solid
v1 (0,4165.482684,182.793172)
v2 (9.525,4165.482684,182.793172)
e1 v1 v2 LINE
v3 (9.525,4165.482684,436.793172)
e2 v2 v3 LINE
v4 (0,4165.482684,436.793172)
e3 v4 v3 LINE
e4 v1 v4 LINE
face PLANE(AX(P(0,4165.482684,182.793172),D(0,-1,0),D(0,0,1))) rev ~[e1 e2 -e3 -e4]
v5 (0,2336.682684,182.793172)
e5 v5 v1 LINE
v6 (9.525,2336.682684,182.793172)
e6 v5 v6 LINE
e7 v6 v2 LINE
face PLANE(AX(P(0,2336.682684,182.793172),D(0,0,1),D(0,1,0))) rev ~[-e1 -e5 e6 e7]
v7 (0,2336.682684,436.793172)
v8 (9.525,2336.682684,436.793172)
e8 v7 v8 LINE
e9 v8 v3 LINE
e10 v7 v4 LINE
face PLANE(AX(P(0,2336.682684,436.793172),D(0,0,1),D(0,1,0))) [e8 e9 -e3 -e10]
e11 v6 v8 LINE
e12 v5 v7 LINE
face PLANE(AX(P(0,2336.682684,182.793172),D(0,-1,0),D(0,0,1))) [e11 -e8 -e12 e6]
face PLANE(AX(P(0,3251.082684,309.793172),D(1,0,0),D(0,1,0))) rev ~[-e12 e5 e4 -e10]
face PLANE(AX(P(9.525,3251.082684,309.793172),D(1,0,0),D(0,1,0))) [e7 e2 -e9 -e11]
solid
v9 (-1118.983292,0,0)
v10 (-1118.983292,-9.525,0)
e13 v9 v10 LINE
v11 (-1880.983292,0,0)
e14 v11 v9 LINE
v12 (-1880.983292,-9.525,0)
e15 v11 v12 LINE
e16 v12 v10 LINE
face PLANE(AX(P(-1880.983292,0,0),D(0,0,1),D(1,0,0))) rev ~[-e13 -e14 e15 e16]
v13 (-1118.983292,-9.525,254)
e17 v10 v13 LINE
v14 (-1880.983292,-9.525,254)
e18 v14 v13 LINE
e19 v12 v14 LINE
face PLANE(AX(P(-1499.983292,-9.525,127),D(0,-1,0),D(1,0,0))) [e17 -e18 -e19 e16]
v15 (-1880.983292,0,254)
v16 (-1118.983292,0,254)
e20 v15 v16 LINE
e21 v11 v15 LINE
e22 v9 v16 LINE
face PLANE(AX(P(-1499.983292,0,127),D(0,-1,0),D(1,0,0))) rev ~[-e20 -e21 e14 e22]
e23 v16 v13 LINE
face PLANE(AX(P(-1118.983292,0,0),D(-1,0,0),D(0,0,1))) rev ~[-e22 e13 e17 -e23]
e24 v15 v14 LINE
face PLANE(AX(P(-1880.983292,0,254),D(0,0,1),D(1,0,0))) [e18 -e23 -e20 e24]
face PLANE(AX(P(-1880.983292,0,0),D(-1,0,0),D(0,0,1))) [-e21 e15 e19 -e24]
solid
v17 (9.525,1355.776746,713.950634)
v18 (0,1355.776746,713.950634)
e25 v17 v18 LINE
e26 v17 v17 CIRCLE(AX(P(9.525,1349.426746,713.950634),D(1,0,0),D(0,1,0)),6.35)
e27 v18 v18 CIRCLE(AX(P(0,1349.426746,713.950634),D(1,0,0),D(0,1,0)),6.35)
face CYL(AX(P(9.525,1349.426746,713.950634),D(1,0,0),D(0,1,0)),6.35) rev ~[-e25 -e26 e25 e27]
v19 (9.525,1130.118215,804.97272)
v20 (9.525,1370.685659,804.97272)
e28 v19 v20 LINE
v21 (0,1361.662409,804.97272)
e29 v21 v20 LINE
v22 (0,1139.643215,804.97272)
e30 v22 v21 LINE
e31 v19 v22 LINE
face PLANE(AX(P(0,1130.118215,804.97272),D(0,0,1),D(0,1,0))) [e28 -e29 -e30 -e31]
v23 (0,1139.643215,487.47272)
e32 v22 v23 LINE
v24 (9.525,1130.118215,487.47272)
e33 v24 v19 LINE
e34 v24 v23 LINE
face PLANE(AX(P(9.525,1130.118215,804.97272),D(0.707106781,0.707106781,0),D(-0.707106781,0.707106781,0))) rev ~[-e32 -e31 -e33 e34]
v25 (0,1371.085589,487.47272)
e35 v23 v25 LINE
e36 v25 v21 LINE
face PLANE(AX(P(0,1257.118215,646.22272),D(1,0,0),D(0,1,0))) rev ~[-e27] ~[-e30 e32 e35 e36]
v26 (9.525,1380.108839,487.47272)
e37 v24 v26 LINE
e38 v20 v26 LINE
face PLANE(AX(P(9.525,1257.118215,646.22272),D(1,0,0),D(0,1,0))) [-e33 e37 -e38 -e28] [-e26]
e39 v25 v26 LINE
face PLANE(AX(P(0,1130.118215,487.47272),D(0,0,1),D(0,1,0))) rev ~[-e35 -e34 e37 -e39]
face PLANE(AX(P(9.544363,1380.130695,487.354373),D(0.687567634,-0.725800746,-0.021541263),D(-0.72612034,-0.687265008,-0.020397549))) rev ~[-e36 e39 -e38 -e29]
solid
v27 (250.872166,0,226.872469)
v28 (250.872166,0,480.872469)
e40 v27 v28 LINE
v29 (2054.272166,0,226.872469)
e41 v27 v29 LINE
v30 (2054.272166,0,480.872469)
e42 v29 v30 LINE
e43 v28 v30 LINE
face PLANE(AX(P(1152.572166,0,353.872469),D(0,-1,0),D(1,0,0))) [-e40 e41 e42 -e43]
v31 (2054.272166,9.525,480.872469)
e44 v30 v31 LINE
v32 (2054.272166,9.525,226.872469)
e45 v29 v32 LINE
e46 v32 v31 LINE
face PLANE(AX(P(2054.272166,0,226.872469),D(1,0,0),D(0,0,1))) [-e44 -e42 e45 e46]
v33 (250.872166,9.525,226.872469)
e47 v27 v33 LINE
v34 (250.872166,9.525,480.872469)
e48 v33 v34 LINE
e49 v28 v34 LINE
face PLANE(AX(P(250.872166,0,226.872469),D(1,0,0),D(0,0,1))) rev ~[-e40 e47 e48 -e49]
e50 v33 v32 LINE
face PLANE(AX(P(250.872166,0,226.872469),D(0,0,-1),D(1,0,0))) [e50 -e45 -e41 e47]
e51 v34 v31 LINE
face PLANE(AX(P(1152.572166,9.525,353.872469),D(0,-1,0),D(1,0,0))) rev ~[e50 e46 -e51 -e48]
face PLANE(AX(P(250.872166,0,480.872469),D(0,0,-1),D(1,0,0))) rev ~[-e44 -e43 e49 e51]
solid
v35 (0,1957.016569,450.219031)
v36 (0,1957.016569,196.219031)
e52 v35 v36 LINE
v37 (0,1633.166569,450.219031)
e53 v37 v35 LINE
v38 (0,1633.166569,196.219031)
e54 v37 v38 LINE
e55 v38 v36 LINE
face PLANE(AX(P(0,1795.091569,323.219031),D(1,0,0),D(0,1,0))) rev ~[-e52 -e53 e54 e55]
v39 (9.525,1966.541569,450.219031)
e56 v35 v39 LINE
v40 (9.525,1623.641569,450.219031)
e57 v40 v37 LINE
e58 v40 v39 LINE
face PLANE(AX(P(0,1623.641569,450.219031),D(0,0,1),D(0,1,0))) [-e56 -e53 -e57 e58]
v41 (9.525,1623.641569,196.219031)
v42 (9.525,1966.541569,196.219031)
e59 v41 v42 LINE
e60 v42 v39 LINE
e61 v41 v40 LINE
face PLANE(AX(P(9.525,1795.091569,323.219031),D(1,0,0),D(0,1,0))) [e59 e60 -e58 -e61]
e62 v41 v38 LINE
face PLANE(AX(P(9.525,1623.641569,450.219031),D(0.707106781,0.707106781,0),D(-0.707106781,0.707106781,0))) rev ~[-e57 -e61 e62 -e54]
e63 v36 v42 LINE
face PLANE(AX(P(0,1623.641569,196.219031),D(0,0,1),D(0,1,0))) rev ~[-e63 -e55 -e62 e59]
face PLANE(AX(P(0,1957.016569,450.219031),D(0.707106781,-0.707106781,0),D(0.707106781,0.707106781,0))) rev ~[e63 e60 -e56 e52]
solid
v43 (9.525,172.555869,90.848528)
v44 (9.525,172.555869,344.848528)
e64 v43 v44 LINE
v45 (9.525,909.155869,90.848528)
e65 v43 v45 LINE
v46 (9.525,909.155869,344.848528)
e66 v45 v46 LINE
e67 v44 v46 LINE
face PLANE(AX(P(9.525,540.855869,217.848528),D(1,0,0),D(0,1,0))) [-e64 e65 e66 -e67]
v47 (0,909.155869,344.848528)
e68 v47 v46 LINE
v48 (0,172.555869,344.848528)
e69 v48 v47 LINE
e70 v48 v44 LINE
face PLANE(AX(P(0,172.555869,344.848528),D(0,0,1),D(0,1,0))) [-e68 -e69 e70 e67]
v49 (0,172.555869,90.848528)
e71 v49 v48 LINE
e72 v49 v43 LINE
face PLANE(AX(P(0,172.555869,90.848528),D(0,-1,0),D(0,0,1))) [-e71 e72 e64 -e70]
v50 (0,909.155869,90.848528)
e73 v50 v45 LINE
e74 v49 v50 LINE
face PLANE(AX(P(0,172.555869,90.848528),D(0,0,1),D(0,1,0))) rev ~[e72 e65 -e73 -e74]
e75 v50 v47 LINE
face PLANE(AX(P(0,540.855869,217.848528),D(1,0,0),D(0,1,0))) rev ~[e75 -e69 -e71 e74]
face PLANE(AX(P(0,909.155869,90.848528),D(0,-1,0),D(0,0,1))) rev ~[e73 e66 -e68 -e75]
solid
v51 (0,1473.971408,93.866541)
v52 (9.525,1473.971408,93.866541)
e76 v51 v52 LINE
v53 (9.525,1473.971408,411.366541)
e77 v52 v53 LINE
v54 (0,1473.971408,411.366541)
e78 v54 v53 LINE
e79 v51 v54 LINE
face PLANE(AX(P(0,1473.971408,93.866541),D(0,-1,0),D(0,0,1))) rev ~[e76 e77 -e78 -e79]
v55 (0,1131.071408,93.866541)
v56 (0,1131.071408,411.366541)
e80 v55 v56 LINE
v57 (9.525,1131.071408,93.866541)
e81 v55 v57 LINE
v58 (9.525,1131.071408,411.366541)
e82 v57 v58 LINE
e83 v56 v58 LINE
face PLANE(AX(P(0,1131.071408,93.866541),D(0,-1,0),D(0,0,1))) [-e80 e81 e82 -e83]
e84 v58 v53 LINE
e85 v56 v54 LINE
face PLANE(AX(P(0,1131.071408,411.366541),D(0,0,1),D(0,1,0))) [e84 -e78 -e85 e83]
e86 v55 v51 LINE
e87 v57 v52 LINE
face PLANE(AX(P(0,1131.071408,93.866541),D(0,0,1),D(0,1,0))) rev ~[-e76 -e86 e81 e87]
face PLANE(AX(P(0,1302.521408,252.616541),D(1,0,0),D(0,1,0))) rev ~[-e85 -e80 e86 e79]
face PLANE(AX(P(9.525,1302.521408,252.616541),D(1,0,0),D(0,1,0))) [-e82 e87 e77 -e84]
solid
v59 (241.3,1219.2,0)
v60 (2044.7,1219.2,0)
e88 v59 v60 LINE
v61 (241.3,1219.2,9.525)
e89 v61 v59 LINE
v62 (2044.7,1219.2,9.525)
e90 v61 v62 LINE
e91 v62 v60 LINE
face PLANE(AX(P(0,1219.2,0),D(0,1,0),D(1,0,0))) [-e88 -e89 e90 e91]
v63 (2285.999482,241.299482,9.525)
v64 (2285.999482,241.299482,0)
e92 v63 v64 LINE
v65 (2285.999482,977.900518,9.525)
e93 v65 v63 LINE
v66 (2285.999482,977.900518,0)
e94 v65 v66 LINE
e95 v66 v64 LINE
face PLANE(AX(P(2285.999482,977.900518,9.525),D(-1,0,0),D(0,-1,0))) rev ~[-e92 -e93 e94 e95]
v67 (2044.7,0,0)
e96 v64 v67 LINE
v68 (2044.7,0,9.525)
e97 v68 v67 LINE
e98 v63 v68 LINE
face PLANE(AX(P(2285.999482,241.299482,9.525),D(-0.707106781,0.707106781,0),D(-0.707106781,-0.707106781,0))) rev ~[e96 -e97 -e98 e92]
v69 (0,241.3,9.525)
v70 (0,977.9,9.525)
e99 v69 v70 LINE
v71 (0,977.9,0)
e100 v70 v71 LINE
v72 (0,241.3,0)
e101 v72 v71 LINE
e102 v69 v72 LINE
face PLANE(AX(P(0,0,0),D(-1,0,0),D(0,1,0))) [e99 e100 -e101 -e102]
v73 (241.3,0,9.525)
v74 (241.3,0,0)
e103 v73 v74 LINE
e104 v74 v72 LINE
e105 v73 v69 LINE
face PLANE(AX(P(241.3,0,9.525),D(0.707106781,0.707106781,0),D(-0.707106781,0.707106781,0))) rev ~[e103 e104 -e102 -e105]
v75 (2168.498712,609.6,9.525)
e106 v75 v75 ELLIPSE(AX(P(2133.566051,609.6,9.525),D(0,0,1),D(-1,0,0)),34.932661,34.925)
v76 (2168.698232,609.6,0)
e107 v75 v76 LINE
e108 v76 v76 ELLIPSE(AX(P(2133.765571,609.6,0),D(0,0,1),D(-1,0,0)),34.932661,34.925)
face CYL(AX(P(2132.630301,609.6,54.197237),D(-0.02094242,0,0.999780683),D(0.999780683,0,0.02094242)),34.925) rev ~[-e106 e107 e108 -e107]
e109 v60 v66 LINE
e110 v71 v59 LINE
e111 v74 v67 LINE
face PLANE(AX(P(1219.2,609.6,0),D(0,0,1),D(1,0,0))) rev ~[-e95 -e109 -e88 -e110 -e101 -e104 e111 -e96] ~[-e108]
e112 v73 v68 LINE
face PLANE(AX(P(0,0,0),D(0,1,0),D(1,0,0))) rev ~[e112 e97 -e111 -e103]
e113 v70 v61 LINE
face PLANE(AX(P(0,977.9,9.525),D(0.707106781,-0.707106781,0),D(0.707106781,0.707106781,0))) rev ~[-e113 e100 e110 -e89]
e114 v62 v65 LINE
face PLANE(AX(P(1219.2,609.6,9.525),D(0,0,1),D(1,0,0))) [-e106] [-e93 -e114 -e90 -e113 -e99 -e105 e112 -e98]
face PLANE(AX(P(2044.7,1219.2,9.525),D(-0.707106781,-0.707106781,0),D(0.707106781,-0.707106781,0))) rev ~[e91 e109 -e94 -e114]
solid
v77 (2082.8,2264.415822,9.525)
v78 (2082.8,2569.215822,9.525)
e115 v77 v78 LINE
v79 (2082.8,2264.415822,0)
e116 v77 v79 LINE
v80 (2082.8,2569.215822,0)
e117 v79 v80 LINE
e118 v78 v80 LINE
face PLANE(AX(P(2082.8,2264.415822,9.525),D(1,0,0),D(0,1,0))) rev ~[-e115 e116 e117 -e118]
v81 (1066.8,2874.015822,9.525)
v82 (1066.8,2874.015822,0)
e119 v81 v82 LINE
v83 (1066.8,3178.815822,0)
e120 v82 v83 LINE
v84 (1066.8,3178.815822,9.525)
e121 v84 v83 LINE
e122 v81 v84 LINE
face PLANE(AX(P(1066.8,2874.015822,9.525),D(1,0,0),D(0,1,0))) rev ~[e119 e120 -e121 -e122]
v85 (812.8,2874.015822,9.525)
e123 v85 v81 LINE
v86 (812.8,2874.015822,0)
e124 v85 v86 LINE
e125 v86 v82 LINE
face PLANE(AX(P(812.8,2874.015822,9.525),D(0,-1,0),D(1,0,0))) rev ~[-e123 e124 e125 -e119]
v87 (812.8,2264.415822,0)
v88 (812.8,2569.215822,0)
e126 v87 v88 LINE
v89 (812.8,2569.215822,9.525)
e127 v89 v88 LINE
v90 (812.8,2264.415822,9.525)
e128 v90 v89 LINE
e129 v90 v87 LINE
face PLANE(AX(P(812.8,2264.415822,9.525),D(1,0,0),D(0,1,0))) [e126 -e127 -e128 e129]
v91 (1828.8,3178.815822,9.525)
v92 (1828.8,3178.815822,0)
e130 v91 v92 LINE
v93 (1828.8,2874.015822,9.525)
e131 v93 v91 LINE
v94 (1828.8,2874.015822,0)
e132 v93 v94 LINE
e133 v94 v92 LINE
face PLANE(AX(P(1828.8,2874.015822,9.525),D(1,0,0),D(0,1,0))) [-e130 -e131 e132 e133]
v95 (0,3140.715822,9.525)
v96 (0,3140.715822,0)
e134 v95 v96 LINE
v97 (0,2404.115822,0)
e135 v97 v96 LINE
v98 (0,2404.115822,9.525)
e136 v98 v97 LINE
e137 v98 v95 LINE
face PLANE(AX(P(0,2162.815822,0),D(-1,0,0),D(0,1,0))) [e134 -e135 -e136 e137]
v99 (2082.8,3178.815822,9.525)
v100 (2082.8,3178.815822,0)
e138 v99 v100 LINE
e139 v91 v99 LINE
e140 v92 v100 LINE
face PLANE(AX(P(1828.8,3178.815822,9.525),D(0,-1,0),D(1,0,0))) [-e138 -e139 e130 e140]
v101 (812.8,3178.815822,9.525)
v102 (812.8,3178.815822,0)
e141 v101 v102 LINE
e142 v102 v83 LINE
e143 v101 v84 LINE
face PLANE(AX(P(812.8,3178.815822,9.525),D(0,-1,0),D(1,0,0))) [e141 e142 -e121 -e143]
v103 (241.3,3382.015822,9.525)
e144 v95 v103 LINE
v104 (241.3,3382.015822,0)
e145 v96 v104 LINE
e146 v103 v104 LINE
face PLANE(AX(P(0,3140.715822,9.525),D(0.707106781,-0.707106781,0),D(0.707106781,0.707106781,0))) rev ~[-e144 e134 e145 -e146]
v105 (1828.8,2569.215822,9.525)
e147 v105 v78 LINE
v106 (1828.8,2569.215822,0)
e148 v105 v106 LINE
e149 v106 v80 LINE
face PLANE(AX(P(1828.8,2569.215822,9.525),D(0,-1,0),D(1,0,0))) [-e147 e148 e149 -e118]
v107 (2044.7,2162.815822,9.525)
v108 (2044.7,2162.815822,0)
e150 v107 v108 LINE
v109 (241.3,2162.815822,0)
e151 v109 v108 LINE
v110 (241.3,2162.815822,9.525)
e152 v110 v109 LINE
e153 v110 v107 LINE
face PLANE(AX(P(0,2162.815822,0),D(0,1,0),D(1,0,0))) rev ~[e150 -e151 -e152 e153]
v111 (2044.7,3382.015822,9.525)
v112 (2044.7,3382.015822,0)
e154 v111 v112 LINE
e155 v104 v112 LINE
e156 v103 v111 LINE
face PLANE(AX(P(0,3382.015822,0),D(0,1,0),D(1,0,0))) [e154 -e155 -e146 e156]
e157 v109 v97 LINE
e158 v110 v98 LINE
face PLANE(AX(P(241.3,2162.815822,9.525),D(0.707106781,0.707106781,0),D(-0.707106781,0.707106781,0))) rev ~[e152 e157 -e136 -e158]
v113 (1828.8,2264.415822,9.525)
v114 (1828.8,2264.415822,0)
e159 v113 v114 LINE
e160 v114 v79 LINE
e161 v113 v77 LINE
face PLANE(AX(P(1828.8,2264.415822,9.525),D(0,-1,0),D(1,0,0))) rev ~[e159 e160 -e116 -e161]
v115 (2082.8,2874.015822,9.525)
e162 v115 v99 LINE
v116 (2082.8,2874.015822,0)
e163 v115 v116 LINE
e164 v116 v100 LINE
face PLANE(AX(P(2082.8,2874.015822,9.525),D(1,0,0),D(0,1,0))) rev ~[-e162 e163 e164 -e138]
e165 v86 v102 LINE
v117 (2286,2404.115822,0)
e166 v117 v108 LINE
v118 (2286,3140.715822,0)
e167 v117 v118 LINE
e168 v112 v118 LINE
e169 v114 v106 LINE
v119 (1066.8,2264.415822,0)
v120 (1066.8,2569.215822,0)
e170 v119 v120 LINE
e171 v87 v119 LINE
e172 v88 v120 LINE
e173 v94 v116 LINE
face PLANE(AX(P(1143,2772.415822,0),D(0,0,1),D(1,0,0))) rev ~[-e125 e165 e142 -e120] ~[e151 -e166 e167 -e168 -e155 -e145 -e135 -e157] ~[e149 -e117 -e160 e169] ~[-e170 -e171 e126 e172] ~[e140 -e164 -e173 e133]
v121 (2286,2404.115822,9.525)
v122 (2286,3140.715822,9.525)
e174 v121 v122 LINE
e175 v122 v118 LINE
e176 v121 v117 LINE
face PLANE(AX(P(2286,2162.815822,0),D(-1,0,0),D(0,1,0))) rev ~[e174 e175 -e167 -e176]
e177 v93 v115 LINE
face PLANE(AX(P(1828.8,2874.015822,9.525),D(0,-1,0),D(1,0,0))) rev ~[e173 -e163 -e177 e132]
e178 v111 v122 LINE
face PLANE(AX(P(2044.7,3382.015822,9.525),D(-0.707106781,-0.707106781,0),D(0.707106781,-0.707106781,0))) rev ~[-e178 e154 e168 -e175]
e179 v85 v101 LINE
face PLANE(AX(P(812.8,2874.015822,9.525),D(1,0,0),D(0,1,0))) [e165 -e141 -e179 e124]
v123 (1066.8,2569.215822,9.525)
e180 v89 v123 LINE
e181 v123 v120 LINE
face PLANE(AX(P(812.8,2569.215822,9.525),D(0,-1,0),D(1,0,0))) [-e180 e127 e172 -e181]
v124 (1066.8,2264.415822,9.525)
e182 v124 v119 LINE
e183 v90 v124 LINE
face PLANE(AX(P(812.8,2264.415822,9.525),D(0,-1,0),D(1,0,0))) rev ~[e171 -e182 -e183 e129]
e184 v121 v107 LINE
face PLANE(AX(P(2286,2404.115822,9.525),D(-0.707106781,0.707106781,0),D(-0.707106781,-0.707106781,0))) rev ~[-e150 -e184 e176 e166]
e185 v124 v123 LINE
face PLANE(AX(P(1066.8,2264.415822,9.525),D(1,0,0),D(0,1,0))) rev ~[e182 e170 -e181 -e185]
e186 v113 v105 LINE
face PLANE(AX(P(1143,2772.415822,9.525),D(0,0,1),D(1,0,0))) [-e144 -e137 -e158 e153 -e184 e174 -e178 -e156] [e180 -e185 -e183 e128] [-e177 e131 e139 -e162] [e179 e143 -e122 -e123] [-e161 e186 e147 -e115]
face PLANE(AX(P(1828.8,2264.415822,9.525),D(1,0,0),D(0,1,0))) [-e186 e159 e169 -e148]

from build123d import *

# Parameters (mm, degrees)
F0_W      = 2438.4
F0_H      = 1219.2
F1_DEPTH  = 9.525
F3_DEPTH  = 25.4
F5_DEPTH  = 25.4
F6_W      = 736.6
F6_H      = 254
F7_DEPTH  = 9.525
F8_W      = 1803.4
F8_H      = 254
F9_DEPTH  = 9.525
F10_W     = 736.6
F10_H     = 317.5
F11_DEPTH = 9.525
F12_W     = 254
F12_H     = 317.5
F13_DEPTH = 9.525
F15_DEPTH = 317.5
F18_DEPTH = 330.2
F19_R     = 6.35
F20_DEPTH = 25.4
F21_W     = 342.9
F21_H     = 317.5
F23_DEPTH = 9.525
F22_W     = 342.9
F22_H     = 254
F24_DEPTH = 9.525
F25_W     = 2286
F25_H     = 1219.2
F26_DEPTH = 9.525
F28_DEPTH = 25.4
F30_W     = 33.3816595376
F30_H     = 808.2542568445
F31_DEPTH = 25.4
F32_W     = 1828.8
F32_H     = 254
F33_DEPTH = 9.525
F34_W     = 762
F34_H     = 254
F35_DEPTH = 9.525
F37_DEPTH = 254
F38_W     = 254
F38_H     = 304.8
F39_DEPTH = 101.6
F40_R     = 34.925
F41_DEPTH = 127


# Not quite as in the source:
# - a feature names something its author has since deleted; it is built from what else it names


with BuildPart() as f1:
    # F0 (on Top) → F1 (new body)
    with BuildSketch(Plane.XY):
        with Locations((1219.2, 609.6)):
            Rectangle(F0_W, F0_H)
    extrude(amount=F1_DEPTH)

    # F2 (on face) → F3 (cut)
    with BuildSketch(Plane.XY.offset(9.525)):
        Polygon((0, 1219.2), (0, 977.9), (241.3, 1219.2), align=None)
        Polygon((241.3, 0), (0, 241.3), (0, 0), align=None)
    extrude(amount=-F3_DEPTH, mode=Mode.SUBTRACT)

    # F4 (on face) → F5 (cut)
    with BuildSketch(Plane.XY.offset(9.525)):
        Polygon((2438.4, 0), (2438.4, 1219.2), (2044.7, 1219.2), (2285.9994819731, 977.9005180269), (2285.9994819731, 241.2994819731), (2044.7, 0), align=None)
    extrude(amount=-F5_DEPTH, mode=Mode.SUBTRACT)

    # F30 (on face) → F31 (cut)
    with BuildSketch(Plane(origin=(-0.1994328009, 0, 9.5208224783), x_dir=(0.9997806835, 0, 0.0209424199), z_dir=(-0.0209424199, 0, 0.9997806835))):
        with Locations((-16.6908297688, 615.603916347)):
            Rectangle(F30_W, F30_H)
    extrude(amount=-F31_DEPTH, mode=Mode.SUBTRACT)

    # F40 (on face) → F41 (cut)
    with BuildSketch(Plane(origin=(-0.1994328009, 0, 9.5208224783), x_dir=(0.9997806835, 0, 0.0209424199), z_dir=(-0.0209424199, 0, 0.9997806835))):
        with Locations((2133.2976010596, 609.6)):
            Circle(F40_R)
    extrude(amount=-F41_DEPTH, mode=Mode.SUBTRACT)


with BuildPart() as f7:
    # F6 (on Right) → F7 (new body)
    with BuildSketch(Plane.YZ):
        with Locations((540.855868909, 217.8485281765)):
            Rectangle(F6_W, F6_H)
    extrude(amount=F7_DEPTH)


with BuildPart() as f9:
    # F8 (on Front) → F9 (new body)
    with BuildSketch(Plane.XZ):
        with Locations((1152.5721657038, 353.8724693788)):
            Rectangle(F8_W, F8_H)
    extrude(amount=-F9_DEPTH)


with BuildPart() as f11:
    # F10 (on Right) → F11 (new body)
    with BuildSketch(Plane.YZ):
        with Locations((396.9467690647, 657.1327268381)):
            Rectangle(F10_W, F10_H)
    extrude(amount=F11_DEPTH)


with BuildPart() as f13:
    # F12 (on Right) → F13 (new body)
    with BuildSketch(Plane.YZ):
        with Locations((1257.1182154525, 646.2227201939)):
            Rectangle(F12_W, F12_H)
    extrude(amount=F13_DEPTH)

    # F14 (on face) → F15 (cut)
    with BuildSketch(Plane.XY.offset(804.9727201939)):
        Polygon((0, 1130.1182154525), (9.525, 1130.1182154525), (0, 1139.6432154525), align=None)
    extrude(amount=-F15_DEPTH, mode=Mode.SUBTRACT)

    # F17 (on face) → F18 (cut)
    with BuildSketch(Plane(origin=(0, -13.2369765094, 446.0001862794), x_dir=(1, 0, 0), z_dir=(0, 0.0296662441, -0.9995598601))):
        Polygon((10.085565038, -1394.4936855086), (9.5443632454, -1393.981218338), (0, -1384.9436044693), (0, -1420.4403162003), (10.085565038, -1420.4403162003), align=None)
    extrude(amount=-F18_DEPTH, mode=Mode.SUBTRACT)

    # F19 (on face) → F20 (cut)
    with BuildSketch(Plane.YZ.offset(9.525)):
        with Locations((1349.4267463684, 713.9506340027)):
            Circle(F19_R)
    extrude(amount=-F20_DEPTH, mode=Mode.SUBTRACT)


with BuildPart() as f23:
    # F21 (on Right) → F23 (new body)
    with BuildSketch(Plane.YZ):
        with Locations((1302.5214076042, 252.6165406551)):
            Rectangle(F21_W, F21_H)
    extrude(amount=F23_DEPTH)


with BuildPart() as f24:
    # F22 (on Right) → F24 (new body)
    with BuildSketch(Plane.YZ):
        with Locations((1795.0915694237, 323.2190309106)):
            Rectangle(F22_W, F22_H)
    extrude(amount=F24_DEPTH)

    # F36 (on face) → F37 (cut)
    with BuildSketch(Plane.XY.offset(450.2190309106)):
        Polygon((0, 1957.0165694237), (9.525, 1966.5415694237), (0, 1966.5415694237), align=None)
        Polygon((0, 1623.6415694237), (9.525, 1623.6415694237), (0, 1633.1665694237), align=None)
    extrude(amount=-F37_DEPTH, mode=Mode.SUBTRACT)


with BuildPart() as f26:
    # F25 (on Top) → F26 (new body)
    with BuildSketch(Plane.XY):
        with Locations((1143, 2772.41582157)):
            Rectangle(F25_W, F25_H)
    extrude(amount=F26_DEPTH)

    # F27 (on face) → F28 (cut)
    with BuildSketch(Plane.XY.offset(9.525)):
        Polygon((241.3, 3382.01582157), (0, 3382.01582157), (0, 3140.71582157), align=None)
        Polygon((241.3, 2162.81582157), (0, 2404.11582157), (0, 2162.81582157), align=None)
        Polygon((2286, 3382.01582157), (2044.7, 3382.01582157), (2286, 3140.71582157), align=None)
        Polygon((2286, 2162.81582157), (2286, 2404.11582157), (2044.7, 2162.81582157), align=None)
    extrude(amount=-F28_DEPTH, mode=Mode.SUBTRACT)

    # F38 (on face) → F39 (cut)
    with BuildSketch(Plane.XY.offset(9.525)):
        with Locations((939.8, 3026.41582157)):
            Rectangle(F38_W, F38_H)
        with Locations((939.8, 2416.81582157)):
            Rectangle(F38_W, F38_H)
        with Locations((1955.8, 3026.41582157)):
            Rectangle(F38_W, F38_H)
        with Locations((1955.8, 2416.81582157)):
            Rectangle(F38_W, F38_H)
    extrude(amount=-F39_DEPTH, mode=Mode.SUBTRACT)


with BuildPart() as f33:
    # F32 (on Right) → F33 (new body)
    with BuildSketch(Plane.YZ):
        with Locations((3251.0826839447, 309.7931716245)):
            Rectangle(F32_W, F32_H)
    extrude(amount=F33_DEPTH)


with BuildPart() as f35:
    # F34 (on Front) → F35 (new body)
    with BuildSketch(Plane.XZ):
        with Locations((-1499.9832916029, 127)):
            Rectangle(F34_W, F34_H)
    extrude(amount=F35_DEPTH)


solid = Compound([f1.part, f7.part, f9.part, f13.part, f23.part, f24.part, f26.part, f33.part, f35.part])
